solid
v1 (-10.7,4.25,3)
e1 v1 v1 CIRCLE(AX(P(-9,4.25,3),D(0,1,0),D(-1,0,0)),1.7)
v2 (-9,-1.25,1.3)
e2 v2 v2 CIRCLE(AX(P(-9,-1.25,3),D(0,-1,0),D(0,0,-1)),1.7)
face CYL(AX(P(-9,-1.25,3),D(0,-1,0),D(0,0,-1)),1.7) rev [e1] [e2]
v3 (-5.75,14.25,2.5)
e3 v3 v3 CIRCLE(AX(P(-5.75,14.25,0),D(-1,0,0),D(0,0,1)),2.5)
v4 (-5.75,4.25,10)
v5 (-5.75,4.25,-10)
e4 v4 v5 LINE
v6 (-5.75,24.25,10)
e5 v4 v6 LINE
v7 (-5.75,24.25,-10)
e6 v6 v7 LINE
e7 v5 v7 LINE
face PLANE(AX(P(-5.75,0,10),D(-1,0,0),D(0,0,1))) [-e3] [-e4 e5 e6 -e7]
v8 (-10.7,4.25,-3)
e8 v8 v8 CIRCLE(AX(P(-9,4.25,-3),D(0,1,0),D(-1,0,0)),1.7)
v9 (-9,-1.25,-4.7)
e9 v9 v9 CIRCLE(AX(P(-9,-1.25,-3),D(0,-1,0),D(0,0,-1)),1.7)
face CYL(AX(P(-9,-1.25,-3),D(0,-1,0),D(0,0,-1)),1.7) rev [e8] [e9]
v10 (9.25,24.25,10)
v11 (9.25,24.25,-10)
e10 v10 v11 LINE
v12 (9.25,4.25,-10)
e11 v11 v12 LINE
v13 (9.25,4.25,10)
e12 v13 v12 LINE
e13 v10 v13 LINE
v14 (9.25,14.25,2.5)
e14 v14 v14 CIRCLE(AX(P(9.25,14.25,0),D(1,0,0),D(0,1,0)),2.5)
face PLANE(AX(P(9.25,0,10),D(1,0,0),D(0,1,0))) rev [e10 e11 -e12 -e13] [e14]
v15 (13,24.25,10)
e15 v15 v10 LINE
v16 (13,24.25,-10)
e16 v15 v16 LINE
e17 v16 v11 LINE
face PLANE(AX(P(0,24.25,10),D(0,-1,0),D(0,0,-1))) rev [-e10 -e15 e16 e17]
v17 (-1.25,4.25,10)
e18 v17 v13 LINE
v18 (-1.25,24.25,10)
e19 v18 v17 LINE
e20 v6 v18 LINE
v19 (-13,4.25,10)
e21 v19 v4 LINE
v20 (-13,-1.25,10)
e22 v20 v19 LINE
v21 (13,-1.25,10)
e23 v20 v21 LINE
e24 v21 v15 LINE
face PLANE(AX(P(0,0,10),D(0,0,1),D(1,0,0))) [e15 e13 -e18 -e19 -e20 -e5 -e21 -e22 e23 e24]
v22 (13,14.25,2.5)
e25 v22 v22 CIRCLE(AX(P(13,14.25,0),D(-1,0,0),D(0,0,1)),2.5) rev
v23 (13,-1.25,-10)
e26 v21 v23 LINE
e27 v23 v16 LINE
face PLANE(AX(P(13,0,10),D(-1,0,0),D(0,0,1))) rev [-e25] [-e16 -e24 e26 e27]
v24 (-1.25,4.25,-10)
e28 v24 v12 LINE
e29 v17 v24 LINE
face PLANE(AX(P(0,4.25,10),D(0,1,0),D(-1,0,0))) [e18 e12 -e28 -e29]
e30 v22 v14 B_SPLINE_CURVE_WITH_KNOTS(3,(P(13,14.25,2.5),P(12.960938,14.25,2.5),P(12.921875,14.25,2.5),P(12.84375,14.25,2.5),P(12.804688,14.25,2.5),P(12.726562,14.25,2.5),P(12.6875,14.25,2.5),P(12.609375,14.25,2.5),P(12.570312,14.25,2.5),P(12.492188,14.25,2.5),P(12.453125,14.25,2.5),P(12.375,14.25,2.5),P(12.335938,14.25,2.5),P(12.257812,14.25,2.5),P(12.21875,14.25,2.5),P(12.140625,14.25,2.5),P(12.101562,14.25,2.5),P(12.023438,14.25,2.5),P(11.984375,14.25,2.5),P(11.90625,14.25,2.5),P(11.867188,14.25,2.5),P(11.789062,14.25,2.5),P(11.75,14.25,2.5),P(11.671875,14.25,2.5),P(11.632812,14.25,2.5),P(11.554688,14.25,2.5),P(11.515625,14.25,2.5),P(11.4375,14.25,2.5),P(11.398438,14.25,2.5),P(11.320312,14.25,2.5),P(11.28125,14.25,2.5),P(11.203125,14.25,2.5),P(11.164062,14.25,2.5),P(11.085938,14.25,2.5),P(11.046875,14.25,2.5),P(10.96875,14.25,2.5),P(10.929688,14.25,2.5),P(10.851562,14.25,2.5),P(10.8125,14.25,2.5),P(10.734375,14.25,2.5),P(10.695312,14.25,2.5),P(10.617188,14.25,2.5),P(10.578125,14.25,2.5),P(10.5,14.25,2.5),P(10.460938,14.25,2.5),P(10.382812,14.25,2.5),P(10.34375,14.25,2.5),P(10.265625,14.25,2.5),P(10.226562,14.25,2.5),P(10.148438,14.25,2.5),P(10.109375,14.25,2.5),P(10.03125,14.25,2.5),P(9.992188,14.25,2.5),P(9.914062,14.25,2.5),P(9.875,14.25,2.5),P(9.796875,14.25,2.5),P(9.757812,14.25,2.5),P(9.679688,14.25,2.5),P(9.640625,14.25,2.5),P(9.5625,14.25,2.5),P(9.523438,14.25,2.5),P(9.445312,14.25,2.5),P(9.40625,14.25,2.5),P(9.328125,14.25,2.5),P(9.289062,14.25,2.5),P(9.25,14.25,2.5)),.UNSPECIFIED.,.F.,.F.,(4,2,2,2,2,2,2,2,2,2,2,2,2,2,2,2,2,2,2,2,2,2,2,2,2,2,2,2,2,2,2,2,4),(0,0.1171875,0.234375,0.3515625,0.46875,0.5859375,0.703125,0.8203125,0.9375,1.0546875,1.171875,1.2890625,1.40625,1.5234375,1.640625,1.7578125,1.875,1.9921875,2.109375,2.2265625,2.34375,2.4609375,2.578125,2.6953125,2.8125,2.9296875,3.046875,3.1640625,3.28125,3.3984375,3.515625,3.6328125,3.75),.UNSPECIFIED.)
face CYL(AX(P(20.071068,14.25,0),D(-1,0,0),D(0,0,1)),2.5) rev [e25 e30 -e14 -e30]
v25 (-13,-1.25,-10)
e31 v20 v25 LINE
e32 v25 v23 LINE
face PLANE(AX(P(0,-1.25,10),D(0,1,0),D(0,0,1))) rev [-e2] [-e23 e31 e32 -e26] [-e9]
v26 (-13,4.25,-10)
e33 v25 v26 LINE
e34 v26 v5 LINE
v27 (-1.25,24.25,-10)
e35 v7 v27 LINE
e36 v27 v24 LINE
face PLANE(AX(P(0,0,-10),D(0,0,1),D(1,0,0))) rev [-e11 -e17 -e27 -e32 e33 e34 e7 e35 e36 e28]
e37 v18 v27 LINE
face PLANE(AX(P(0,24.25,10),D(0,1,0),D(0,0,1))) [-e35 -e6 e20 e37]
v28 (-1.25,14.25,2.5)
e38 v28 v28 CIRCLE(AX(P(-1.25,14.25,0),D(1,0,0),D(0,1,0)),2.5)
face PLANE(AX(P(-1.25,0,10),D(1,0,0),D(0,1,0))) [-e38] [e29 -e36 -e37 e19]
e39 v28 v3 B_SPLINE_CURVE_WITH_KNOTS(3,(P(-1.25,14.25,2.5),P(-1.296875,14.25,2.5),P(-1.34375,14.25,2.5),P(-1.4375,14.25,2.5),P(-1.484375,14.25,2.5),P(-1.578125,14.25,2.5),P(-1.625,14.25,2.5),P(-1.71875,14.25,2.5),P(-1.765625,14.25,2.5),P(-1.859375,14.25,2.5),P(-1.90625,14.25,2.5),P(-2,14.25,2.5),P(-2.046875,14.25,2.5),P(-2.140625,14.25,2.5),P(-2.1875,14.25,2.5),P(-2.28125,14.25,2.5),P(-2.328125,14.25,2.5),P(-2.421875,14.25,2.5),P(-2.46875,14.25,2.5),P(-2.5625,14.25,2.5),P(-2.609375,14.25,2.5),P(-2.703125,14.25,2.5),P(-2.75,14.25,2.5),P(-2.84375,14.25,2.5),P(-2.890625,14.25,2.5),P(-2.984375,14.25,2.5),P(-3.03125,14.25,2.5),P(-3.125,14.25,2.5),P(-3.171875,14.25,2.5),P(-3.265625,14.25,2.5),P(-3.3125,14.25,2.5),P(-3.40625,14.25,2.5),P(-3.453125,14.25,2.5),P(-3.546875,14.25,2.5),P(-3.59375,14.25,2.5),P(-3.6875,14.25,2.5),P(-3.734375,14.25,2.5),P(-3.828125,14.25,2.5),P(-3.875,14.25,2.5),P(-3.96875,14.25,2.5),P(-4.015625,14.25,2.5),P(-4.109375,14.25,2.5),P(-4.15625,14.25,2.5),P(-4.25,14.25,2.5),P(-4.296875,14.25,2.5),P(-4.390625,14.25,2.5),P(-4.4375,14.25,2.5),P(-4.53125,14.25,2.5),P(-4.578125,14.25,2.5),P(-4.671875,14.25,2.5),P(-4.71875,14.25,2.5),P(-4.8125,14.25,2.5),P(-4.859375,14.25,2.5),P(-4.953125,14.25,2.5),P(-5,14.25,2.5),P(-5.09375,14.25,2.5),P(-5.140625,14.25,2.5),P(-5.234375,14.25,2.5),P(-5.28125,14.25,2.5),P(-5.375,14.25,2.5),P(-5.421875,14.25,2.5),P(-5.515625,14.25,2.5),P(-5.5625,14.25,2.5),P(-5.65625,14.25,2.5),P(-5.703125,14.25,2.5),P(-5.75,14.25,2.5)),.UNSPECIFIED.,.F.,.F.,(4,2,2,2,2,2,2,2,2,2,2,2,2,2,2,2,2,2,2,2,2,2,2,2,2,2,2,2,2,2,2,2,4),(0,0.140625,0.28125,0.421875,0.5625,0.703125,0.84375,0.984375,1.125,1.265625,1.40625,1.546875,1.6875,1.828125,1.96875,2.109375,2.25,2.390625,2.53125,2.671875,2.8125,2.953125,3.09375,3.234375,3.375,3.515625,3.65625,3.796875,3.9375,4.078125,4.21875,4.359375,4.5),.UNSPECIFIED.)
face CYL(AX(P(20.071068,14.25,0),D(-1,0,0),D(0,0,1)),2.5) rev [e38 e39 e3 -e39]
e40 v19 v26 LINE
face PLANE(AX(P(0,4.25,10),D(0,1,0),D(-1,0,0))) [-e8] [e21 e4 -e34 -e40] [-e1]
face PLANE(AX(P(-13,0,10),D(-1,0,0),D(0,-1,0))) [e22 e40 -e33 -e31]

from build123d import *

# Parameters (mm, degrees)
BODY_START           = -10
BODY_DEPTH           = 20
M3_CLEARANCE_HOLE1_D = 3.4
CUT_EXTRUDE1_REACH   = 34.243
SKETCH4_R            = 2.5


# Read off the part's stored shape, not the designer's step: Body
with BuildPart() as part:
    # Body outline → Body (new body)
    with BuildSketch(Plane.XY.offset(BODY_START)):
        Polygon((9.25, 24.25), (9.25, 4.25), (-1.25, 4.25), (-1.25, 24.25), (-5.75, 24.25), (-5.75, 4.25), (-13, 4.25), (-13, -1.25), (13, -1.25), (13, 24.25), align=None)
    extrude(amount=BODY_DEPTH)

    # M3 Clearance Hole1 (through all)
    with Locations(Plane(origin=(0, -1.25, 0), x_dir=(-1, 0, 0), z_dir=(0, -1, 0))):
        with Locations((9, -3), (9, 3)):
            Hole(M3_CLEARANCE_HOLE1_D / 2)

    # Cut-Extrude1: up to this face of the body (flat: up to its plane)
    cut_extrude1_end = Plane(part.part.faces().sort_by_distance((13, 11.5, 0))[0])
    # Sketch4 → Cut-Extrude1 (cut, up to the picked face)
    with BuildSketch(Plane.ZY.offset(5.75), mode=Mode.PRIVATE) as cut_extrude1_sk1:
        with Locations((0, 14.25)):
            Circle(SKETCH4_R)
    cut_extrude1_tool1 = split(extrude(cut_extrude1_sk1.sketch, amount=-CUT_EXTRUDE1_REACH, mode=Mode.PRIVATE), bisect_by=cut_extrude1_end, keep=Keep.BOTH, mode=Mode.PRIVATE)
    add(cut_extrude1_tool1.solids().sort_by(Axis((-5.75, 14.25, 0), (1, 0, 0)))[0], mode=Mode.SUBTRACT)


solid = part.part
